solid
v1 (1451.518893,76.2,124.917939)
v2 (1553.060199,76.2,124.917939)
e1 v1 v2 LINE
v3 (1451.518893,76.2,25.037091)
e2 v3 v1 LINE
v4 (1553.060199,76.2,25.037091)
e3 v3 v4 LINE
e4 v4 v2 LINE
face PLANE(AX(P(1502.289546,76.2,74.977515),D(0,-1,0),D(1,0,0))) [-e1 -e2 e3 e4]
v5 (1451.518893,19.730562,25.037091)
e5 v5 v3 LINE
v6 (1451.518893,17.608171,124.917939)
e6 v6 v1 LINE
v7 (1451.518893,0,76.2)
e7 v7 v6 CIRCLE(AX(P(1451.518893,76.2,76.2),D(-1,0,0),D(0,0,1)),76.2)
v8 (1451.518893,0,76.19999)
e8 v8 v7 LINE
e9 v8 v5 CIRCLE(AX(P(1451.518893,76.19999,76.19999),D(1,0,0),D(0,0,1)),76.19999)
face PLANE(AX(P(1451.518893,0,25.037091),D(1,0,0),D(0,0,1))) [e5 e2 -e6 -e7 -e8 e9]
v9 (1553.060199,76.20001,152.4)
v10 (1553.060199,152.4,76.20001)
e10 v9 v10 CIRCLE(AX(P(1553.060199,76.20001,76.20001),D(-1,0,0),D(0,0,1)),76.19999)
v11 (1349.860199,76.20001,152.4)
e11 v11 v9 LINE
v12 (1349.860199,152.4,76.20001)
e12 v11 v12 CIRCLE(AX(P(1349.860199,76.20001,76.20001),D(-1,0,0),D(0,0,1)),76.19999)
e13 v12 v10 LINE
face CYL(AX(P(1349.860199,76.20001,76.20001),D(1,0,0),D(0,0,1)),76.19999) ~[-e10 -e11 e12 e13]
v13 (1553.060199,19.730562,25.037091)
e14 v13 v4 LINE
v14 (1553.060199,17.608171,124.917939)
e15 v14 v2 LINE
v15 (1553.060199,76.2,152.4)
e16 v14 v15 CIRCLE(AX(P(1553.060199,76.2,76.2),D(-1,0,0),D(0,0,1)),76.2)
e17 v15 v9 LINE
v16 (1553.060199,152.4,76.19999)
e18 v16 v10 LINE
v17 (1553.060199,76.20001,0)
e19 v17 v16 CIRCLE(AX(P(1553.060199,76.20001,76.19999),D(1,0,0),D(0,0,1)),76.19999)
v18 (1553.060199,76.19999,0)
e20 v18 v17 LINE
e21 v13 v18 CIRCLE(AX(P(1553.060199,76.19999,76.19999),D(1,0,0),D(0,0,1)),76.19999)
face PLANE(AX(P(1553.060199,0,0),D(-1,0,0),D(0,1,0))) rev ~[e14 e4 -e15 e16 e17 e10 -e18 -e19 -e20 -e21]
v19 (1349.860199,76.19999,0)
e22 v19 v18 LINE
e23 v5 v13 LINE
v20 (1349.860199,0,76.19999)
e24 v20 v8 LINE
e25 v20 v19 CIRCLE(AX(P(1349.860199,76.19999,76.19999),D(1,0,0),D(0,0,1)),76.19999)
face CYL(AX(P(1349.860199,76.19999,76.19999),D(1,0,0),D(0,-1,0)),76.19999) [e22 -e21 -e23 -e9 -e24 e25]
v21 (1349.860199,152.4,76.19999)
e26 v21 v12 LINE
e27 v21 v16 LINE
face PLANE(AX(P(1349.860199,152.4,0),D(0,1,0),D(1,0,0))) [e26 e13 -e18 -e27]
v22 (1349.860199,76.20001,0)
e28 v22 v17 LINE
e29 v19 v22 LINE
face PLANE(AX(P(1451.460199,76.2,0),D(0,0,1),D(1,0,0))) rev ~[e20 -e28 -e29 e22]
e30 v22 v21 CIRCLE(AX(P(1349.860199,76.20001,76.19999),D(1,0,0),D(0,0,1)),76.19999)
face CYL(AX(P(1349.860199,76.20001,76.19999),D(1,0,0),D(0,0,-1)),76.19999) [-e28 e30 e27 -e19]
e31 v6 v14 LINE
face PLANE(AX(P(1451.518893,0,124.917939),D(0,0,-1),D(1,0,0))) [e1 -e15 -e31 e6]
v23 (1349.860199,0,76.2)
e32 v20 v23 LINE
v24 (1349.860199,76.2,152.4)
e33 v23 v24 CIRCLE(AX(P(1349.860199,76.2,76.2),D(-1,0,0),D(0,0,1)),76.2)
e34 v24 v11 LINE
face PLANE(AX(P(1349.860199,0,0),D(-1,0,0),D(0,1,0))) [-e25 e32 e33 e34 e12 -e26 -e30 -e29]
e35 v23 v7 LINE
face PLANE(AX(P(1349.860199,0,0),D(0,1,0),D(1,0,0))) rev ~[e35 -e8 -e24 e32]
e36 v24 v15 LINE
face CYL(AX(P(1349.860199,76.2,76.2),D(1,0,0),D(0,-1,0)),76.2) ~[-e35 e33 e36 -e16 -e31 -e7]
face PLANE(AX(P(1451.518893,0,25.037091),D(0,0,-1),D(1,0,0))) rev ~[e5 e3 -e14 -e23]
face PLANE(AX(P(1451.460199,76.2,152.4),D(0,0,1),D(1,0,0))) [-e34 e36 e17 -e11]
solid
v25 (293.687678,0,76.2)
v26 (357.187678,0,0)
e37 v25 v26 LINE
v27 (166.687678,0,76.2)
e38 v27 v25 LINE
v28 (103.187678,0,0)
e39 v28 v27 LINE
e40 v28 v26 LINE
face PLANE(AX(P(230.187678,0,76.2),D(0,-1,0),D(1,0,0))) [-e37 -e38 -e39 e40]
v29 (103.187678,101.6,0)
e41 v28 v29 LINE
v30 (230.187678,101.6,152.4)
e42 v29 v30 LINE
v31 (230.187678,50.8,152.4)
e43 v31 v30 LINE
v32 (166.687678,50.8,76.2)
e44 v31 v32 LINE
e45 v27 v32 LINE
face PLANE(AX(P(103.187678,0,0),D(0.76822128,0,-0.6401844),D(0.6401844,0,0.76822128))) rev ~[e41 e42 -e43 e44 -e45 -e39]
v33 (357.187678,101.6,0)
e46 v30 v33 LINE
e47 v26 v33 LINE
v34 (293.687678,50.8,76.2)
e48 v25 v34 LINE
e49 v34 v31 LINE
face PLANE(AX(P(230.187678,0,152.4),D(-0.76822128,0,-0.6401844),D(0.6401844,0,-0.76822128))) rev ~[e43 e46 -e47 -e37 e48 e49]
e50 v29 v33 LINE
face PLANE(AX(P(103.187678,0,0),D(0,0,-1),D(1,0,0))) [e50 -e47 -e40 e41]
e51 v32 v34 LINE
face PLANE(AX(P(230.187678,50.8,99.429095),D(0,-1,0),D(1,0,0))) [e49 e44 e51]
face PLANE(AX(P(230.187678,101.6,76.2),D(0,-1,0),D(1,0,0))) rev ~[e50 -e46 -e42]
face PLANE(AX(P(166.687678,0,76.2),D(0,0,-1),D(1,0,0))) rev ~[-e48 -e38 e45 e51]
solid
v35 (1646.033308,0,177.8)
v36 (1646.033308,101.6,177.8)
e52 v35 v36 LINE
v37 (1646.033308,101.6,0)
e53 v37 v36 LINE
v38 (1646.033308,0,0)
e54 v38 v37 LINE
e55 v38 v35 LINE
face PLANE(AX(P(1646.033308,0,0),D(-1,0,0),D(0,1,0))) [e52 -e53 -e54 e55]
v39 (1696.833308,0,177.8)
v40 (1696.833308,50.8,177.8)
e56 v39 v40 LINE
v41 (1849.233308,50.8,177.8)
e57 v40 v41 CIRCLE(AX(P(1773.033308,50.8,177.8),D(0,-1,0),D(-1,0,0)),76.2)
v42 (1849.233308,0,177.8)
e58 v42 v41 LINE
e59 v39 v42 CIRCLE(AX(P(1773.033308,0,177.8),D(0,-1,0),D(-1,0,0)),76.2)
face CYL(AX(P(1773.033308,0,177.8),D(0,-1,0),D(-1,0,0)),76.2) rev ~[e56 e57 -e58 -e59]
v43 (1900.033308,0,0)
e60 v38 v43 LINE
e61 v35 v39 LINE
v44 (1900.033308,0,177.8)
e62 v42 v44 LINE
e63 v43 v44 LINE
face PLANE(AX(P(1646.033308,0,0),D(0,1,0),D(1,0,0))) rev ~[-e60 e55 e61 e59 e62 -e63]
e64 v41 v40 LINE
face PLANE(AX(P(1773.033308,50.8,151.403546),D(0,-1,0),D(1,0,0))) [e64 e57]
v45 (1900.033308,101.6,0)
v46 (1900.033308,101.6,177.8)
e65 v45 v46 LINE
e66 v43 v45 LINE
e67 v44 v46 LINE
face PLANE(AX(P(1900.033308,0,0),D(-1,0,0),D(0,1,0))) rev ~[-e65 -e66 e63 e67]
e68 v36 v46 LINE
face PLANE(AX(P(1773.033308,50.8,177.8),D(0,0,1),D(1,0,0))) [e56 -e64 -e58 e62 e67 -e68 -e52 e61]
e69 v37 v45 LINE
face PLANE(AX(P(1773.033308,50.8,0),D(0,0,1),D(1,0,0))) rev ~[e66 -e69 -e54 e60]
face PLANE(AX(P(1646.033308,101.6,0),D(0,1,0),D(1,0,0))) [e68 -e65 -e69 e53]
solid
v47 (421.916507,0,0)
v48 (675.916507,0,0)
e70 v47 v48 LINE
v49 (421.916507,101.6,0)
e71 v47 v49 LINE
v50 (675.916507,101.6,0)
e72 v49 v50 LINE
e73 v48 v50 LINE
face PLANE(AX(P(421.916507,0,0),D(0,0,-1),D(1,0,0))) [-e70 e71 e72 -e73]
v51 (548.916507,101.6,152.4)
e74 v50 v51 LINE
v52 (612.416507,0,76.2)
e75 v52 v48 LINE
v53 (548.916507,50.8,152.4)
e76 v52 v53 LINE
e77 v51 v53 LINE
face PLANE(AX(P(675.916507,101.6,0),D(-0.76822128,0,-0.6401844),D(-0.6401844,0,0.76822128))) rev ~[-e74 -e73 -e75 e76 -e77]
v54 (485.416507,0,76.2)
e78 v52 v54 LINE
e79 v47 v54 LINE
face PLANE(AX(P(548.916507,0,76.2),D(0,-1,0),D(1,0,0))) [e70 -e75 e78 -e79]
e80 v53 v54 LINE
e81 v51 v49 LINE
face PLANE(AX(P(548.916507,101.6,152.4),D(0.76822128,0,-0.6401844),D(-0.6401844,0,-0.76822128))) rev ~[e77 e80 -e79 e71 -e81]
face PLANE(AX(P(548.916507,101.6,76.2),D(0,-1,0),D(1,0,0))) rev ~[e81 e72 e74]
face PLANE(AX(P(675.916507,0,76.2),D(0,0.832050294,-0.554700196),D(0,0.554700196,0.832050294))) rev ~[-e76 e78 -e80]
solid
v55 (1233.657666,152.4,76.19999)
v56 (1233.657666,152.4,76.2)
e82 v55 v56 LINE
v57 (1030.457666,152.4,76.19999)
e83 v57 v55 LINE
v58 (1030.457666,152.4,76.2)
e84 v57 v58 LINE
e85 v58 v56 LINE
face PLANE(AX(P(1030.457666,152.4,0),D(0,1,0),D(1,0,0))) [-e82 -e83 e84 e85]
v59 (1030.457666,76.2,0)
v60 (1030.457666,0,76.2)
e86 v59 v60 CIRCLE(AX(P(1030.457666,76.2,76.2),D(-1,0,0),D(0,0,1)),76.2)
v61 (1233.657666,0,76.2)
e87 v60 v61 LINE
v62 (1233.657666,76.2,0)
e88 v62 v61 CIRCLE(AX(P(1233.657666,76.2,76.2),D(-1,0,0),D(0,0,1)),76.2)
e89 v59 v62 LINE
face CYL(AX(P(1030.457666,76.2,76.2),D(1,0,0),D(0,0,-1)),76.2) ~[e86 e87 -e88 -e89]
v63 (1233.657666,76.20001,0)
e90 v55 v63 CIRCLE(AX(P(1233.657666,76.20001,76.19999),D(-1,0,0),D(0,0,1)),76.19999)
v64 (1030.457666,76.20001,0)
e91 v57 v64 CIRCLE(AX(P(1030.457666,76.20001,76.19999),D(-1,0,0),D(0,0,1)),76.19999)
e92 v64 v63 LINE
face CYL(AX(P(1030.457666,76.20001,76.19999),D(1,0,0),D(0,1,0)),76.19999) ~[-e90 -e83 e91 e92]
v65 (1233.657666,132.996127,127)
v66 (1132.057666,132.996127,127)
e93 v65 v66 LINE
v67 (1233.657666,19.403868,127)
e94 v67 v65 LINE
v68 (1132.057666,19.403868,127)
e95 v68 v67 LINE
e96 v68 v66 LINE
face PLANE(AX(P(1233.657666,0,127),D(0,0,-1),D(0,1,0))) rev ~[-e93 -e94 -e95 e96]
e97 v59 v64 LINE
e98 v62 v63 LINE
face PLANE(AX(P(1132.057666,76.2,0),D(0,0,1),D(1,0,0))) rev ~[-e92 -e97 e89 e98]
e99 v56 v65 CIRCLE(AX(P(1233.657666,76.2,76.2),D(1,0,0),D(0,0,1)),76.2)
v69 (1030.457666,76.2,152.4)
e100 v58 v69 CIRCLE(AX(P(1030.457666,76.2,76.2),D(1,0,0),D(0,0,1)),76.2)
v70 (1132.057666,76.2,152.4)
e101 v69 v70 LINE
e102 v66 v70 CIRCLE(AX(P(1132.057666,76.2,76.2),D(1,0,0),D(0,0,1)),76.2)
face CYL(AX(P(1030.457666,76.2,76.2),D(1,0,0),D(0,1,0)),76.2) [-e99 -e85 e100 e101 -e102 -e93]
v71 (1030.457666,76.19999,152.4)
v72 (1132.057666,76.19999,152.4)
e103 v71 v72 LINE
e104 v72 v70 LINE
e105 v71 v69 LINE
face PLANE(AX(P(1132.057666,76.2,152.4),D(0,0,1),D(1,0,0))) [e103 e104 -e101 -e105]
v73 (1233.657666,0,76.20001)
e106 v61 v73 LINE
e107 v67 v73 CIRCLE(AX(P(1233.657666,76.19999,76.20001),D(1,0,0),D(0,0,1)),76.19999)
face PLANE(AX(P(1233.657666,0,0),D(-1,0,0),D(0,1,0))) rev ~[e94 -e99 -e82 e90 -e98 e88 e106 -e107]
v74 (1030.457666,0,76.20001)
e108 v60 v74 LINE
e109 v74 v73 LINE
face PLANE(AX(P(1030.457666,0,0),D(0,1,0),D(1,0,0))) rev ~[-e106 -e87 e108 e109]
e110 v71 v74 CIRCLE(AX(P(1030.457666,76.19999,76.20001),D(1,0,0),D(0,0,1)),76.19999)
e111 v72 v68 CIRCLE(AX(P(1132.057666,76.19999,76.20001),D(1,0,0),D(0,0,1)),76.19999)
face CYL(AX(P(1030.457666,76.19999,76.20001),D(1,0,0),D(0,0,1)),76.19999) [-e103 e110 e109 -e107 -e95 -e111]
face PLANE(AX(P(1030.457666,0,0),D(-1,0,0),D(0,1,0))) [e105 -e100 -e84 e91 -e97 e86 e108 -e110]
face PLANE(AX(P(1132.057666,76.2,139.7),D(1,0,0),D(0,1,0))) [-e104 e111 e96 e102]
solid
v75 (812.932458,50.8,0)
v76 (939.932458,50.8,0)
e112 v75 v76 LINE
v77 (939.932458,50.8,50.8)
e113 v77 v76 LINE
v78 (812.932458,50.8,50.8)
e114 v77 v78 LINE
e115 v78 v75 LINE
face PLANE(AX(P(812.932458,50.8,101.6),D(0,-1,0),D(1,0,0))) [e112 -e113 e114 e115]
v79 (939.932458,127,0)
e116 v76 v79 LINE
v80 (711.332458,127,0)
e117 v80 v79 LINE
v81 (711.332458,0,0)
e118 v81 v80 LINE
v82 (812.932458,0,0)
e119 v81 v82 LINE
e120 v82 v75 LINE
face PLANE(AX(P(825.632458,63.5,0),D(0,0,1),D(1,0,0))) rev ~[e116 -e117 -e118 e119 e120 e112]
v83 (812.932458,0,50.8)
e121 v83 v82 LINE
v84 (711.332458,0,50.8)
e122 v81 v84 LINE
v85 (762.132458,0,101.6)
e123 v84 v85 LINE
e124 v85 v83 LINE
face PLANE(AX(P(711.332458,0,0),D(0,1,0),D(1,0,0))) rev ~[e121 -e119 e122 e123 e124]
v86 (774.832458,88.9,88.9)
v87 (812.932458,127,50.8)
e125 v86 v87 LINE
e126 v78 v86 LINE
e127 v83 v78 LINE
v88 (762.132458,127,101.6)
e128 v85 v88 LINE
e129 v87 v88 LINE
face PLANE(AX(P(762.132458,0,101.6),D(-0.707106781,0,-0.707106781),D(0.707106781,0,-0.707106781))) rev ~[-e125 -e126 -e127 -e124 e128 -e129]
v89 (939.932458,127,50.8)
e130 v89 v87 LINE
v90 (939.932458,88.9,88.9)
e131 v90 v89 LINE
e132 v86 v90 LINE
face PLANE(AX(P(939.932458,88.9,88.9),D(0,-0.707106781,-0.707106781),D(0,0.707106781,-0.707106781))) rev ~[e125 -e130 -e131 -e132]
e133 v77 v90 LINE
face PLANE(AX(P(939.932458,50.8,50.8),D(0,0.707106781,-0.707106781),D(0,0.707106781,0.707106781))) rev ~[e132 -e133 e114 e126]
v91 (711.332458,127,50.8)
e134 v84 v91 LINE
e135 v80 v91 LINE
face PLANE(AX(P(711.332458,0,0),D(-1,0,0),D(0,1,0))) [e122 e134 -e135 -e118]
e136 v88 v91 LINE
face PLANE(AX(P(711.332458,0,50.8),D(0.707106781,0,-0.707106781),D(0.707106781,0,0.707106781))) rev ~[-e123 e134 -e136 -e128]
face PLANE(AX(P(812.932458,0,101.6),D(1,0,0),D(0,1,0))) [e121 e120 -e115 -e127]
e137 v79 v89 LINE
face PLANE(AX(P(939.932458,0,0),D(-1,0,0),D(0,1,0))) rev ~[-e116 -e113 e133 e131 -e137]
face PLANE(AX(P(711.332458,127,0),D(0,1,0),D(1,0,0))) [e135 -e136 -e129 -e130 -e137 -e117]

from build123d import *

# Parameters (mm, degrees)
F0_W      = 254
F0_H      = 152.4
F1_DEPTH  = 101.6
F3_DEPTH  = 171.45
F5_DEPTH  = 50.8
F7_DEPTH  = 181.102
F8_W      = 254
F8_H      = 152.4
F9_DEPTH  = 101.6
F11_DEPTH = 317.754
F13_DEPTH = 144.78
F15_DEPTH = 111.76
F16_W     = 228.6
F16_H     = 127
F17_DEPTH = 101.6
F18_W     = 127
F18_H     = 50.8
F19_DEPTH = 124.46
F20_W     = 76.2
F20_H     = 12.7
F21_DEPTH = 127
F23_DEPTH = 210.82
F25_DEPTH = 127
F27_DEPTH = 127
F29_DEPTH = 157.48
F31_DEPTH = 177.8
F32_W     = 203.2
F32_H     = 152.4
F33_DEPTH = 152.4
F34_W     = 152.4
F34_H     = 25.4
F35_DEPTH = 101.6
F36_R     = 76.2
F37_R     = 76.19999
F38_R     = 76.19999
F39_R     = 76.2
F40_W     = 203.2
F40_H     = 152.4
F41_DEPTH = 152.4
F42_W     = 101.5413056934
F42_H     = 99.8808480799
F43_DEPTH = 76.2
F44_R     = 76.2
F45_R     = 76.19999
F46_W     = 254
F46_H     = 101.6
F47_DEPTH = 177.8
F49_DEPTH = 50.8


# Not quite as in the source:
# - a fillet or chamfer is up to 0.001 mm smaller than in the source, because OpenCascade refuses the exact size


with BuildPart() as f1:
    # F0 (on Front) → F1 (new body)
    with BuildSketch(Plane.XZ):
        with Locations((230.1876775126, 76.2)):
            Rectangle(F0_W, F0_H)
    extrude(amount=-F1_DEPTH)

    # F2 (on face) → F3 (cut)
    with BuildSketch(Plane.XZ):
        Polygon((103.1876775126, 152.4), (103.1876775126, 0), (166.6876775126, 76.2), (230.1876775126, 152.4), align=None)
    extrude(amount=-F3_DEPTH, mode=Mode.SUBTRACT)

    # F4 (on face) → F5 (cut)
    with BuildSketch(Plane.XZ):
        Polygon((166.6876775126, 76.2), (293.6876775126, 76.2), (230.1876775126, 152.4), align=None)
    extrude(amount=-F5_DEPTH, mode=Mode.SUBTRACT)

    # F6 (on face) → F7 (cut)
    with BuildSketch(Plane.XZ):
        Polygon((230.1876775126, 152.4), (293.6876775126, 76.2), (357.1876775126, 0), (357.1876775126, 152.4), align=None)
    extrude(amount=-F7_DEPTH, mode=Mode.SUBTRACT)


with BuildPart() as f9:
    # F8 (on Front) → F9 (new body)
    with BuildSketch(Plane.XZ):
        with Locations((548.9165070272, 76.2)):
            Rectangle(F8_W, F8_H)
    extrude(amount=-F9_DEPTH)

    # F10 (on face) → F11 (cut)
    with BuildSketch(Plane.YZ.offset(675.9165070272)):
        Polygon((0, 152.4), (0, 76.2), (50.8, 152.4), align=None)
    extrude(amount=-F11_DEPTH, mode=Mode.SUBTRACT)

    # F12 (on face) → F13 (cut)
    with BuildSketch(Plane(origin=(0, 101.6, 0), x_dir=(-1, 0, 0), z_dir=(0, 1, 0))):
        Polygon((-675.9165070272, 152.4), (-675.9165070272, 0), (-548.9165070272, 152.4), align=None)
    extrude(amount=-F13_DEPTH, mode=Mode.SUBTRACT)

    # F14 (on face) → F15 (cut)
    with BuildSketch(Plane(origin=(0, 101.6, 0), x_dir=(-1, 0, 0), z_dir=(0, 1, 0))):
        Polygon((-421.9165070272, 152.4), (-548.9165070272, 152.4), (-421.9165070272, 0), align=None)
    extrude(amount=-F15_DEPTH, mode=Mode.SUBTRACT)


with BuildPart() as f17:
    # F16 (on Top) → F17 (new body)
    with BuildSketch(Plane.XY):
        with Locations((825.6324577618, 63.5)):
            Rectangle(F16_W, F16_H)
    extrude(amount=F17_DEPTH)

    # F18 (on face) → F19 (cut)
    with BuildSketch(Plane.XY.offset(101.6)):
        with Locations((876.4324577618, 25.4)):
            Rectangle(F18_W, F18_H)
    extrude(amount=-F19_DEPTH, mode=Mode.SUBTRACT)

    # F20 (on face) → F21 (cut)
    with BuildSketch(Plane.YZ.offset(939.9324577618)):
        with Locations((88.9, 95.25)):
            Rectangle(F20_W, F20_H)
    extrude(amount=-F21_DEPTH, mode=Mode.SUBTRACT)

    # F22 (on face) → F23 (cut)
    with BuildSketch(Plane.XZ):
        Polygon((711.3324577618, 50.8), (762.1324577618, 101.6), (711.3324577618, 101.6), align=None)
    extrude(amount=-F23_DEPTH, mode=Mode.SUBTRACT)

    # F24 (on face) → F25 (cut)
    with BuildSketch(Plane.YZ.offset(939.9324577618)):
        Polygon((88.9, 88.9), (127, 50.8), (127, 88.9), align=None)
    extrude(amount=-F25_DEPTH, mode=Mode.SUBTRACT)

    # F26 (on face) → F27 (cut)
    with BuildSketch(Plane.YZ.offset(939.9324577618)):
        Polygon((50.8, 88.9), (50.8, 50.8), (88.9, 88.9), align=None)
    extrude(amount=-F27_DEPTH, mode=Mode.SUBTRACT)

    # F28 (on face) → F29 (cut)
    with BuildSketch(Plane.XZ):
        Polygon((762.1324577618, 101.6), (812.9324577618, 50.8), (812.9324577618, 101.6), align=None)
    extrude(amount=-F29_DEPTH, mode=Mode.SUBTRACT)

    # F30 (on face) → F31 (join)
    with BuildSketch(Plane.YZ.offset(939.9324577618)):
        Polygon((88.9, 88.9), (50.8, 50.8), (127, 50.8), align=None)
    extrude(amount=-F31_DEPTH)


with BuildPart() as f33:
    # F32 (on Top) → F33 (new body)
    with BuildSketch(Plane.XY):
        with Locations((1132.0576660588, 76.2)):
            Rectangle(F32_W, F32_H)
    extrude(amount=F33_DEPTH)

    # F34 (on face) → F35 (cut)
    with BuildSketch(Plane.YZ.offset(1233.6576660588)):
        with Locations((76.2, 139.7)):
            Rectangle(F34_W, F34_H)
    extrude(amount=-F35_DEPTH, mode=Mode.SUBTRACT)

    # F36
    f36_edges = [f33.edges().sort_by_distance(p)[0] for p in [
        (1081.257666, 152.4, 152.4),
    ]]
    fillet(f36_edges, radius=F36_R)

    # F37 (radius 76.2 in the source; OpenCascade refuses exactly that, so slightly less here)
    f37_edges = [f33.edges().sort_by_distance(p)[0] for p in [
        (1081.257666, 0, 152.4),
    ]]
    fillet(f37_edges, radius=F37_R)

    # F38 (radius 76.2 in the source; OpenCascade refuses exactly that, so slightly less here)
    f38_edges = [f33.edges().sort_by_distance(p)[0] for p in [
        (1132.057666, 152.4, 0),
    ]]
    fillet(f38_edges, radius=F38_R)

    # F39
    f39_edges = [f33.edges().sort_by_distance(p)[0] for p in [
        (1132.057666, 0, 0),
    ]]
    fillet(f39_edges, radius=F39_R)


with BuildPart() as f41:
    # F40 (on Top) → F41 (new body)
    with BuildSketch(Plane.XY):
        with Locations((1451.4601989353, 76.2)):
            Rectangle(F40_W, F40_H)
    extrude(amount=F41_DEPTH)

    # F42 (on face) → F43 (cut)
    with BuildSketch(Plane.XZ):
        with Locations((1502.2895460886, 74.9775152653)):
            Rectangle(F42_W, F42_H)
    extrude(amount=-F43_DEPTH, mode=Mode.SUBTRACT)

    # F44
    f44_edges = [f41.edges().sort_by_distance(p)[0] for p in [
        (1451.460199, 0, 152.4),
    ]]
    fillet(f44_edges, radius=F44_R)

    # F45 (radius 76.2 in the source; OpenCascade refuses exactly that, so slightly less here)
    f45_edges = [f41.edges().sort_by_distance(p)[0] for p in [
        (1451.460199, 0, 0),
        (1451.460199, 152.4, 152.4),
        (1451.460199, 152.4, 0),
    ]]
    fillet(f45_edges, radius=F45_R)


with BuildPart() as f47:
    # F46 (on Top) → F47 (new body)
    with BuildSketch(Plane.XY):
        with Locations((1773.0333075482, 50.8)):
            Rectangle(F46_W, F46_H)
    extrude(amount=F47_DEPTH)

    # F48 (on face) → F49 (cut)
    with BuildSketch(Plane.XZ):
        with BuildLine():
            ThreePointArc((1696.8333075482, 177.8), (1773.0333075482, 101.6), (1849.2333075482, 177.8))
            Line((1849.2333075482, 177.8), (1696.8333075482, 177.8))
        make_face()
    extrude(amount=-F49_DEPTH, mode=Mode.SUBTRACT)


solid = Compound([f1.part, f9.part, f17.part, f33.part, f41.part, f47.part])
